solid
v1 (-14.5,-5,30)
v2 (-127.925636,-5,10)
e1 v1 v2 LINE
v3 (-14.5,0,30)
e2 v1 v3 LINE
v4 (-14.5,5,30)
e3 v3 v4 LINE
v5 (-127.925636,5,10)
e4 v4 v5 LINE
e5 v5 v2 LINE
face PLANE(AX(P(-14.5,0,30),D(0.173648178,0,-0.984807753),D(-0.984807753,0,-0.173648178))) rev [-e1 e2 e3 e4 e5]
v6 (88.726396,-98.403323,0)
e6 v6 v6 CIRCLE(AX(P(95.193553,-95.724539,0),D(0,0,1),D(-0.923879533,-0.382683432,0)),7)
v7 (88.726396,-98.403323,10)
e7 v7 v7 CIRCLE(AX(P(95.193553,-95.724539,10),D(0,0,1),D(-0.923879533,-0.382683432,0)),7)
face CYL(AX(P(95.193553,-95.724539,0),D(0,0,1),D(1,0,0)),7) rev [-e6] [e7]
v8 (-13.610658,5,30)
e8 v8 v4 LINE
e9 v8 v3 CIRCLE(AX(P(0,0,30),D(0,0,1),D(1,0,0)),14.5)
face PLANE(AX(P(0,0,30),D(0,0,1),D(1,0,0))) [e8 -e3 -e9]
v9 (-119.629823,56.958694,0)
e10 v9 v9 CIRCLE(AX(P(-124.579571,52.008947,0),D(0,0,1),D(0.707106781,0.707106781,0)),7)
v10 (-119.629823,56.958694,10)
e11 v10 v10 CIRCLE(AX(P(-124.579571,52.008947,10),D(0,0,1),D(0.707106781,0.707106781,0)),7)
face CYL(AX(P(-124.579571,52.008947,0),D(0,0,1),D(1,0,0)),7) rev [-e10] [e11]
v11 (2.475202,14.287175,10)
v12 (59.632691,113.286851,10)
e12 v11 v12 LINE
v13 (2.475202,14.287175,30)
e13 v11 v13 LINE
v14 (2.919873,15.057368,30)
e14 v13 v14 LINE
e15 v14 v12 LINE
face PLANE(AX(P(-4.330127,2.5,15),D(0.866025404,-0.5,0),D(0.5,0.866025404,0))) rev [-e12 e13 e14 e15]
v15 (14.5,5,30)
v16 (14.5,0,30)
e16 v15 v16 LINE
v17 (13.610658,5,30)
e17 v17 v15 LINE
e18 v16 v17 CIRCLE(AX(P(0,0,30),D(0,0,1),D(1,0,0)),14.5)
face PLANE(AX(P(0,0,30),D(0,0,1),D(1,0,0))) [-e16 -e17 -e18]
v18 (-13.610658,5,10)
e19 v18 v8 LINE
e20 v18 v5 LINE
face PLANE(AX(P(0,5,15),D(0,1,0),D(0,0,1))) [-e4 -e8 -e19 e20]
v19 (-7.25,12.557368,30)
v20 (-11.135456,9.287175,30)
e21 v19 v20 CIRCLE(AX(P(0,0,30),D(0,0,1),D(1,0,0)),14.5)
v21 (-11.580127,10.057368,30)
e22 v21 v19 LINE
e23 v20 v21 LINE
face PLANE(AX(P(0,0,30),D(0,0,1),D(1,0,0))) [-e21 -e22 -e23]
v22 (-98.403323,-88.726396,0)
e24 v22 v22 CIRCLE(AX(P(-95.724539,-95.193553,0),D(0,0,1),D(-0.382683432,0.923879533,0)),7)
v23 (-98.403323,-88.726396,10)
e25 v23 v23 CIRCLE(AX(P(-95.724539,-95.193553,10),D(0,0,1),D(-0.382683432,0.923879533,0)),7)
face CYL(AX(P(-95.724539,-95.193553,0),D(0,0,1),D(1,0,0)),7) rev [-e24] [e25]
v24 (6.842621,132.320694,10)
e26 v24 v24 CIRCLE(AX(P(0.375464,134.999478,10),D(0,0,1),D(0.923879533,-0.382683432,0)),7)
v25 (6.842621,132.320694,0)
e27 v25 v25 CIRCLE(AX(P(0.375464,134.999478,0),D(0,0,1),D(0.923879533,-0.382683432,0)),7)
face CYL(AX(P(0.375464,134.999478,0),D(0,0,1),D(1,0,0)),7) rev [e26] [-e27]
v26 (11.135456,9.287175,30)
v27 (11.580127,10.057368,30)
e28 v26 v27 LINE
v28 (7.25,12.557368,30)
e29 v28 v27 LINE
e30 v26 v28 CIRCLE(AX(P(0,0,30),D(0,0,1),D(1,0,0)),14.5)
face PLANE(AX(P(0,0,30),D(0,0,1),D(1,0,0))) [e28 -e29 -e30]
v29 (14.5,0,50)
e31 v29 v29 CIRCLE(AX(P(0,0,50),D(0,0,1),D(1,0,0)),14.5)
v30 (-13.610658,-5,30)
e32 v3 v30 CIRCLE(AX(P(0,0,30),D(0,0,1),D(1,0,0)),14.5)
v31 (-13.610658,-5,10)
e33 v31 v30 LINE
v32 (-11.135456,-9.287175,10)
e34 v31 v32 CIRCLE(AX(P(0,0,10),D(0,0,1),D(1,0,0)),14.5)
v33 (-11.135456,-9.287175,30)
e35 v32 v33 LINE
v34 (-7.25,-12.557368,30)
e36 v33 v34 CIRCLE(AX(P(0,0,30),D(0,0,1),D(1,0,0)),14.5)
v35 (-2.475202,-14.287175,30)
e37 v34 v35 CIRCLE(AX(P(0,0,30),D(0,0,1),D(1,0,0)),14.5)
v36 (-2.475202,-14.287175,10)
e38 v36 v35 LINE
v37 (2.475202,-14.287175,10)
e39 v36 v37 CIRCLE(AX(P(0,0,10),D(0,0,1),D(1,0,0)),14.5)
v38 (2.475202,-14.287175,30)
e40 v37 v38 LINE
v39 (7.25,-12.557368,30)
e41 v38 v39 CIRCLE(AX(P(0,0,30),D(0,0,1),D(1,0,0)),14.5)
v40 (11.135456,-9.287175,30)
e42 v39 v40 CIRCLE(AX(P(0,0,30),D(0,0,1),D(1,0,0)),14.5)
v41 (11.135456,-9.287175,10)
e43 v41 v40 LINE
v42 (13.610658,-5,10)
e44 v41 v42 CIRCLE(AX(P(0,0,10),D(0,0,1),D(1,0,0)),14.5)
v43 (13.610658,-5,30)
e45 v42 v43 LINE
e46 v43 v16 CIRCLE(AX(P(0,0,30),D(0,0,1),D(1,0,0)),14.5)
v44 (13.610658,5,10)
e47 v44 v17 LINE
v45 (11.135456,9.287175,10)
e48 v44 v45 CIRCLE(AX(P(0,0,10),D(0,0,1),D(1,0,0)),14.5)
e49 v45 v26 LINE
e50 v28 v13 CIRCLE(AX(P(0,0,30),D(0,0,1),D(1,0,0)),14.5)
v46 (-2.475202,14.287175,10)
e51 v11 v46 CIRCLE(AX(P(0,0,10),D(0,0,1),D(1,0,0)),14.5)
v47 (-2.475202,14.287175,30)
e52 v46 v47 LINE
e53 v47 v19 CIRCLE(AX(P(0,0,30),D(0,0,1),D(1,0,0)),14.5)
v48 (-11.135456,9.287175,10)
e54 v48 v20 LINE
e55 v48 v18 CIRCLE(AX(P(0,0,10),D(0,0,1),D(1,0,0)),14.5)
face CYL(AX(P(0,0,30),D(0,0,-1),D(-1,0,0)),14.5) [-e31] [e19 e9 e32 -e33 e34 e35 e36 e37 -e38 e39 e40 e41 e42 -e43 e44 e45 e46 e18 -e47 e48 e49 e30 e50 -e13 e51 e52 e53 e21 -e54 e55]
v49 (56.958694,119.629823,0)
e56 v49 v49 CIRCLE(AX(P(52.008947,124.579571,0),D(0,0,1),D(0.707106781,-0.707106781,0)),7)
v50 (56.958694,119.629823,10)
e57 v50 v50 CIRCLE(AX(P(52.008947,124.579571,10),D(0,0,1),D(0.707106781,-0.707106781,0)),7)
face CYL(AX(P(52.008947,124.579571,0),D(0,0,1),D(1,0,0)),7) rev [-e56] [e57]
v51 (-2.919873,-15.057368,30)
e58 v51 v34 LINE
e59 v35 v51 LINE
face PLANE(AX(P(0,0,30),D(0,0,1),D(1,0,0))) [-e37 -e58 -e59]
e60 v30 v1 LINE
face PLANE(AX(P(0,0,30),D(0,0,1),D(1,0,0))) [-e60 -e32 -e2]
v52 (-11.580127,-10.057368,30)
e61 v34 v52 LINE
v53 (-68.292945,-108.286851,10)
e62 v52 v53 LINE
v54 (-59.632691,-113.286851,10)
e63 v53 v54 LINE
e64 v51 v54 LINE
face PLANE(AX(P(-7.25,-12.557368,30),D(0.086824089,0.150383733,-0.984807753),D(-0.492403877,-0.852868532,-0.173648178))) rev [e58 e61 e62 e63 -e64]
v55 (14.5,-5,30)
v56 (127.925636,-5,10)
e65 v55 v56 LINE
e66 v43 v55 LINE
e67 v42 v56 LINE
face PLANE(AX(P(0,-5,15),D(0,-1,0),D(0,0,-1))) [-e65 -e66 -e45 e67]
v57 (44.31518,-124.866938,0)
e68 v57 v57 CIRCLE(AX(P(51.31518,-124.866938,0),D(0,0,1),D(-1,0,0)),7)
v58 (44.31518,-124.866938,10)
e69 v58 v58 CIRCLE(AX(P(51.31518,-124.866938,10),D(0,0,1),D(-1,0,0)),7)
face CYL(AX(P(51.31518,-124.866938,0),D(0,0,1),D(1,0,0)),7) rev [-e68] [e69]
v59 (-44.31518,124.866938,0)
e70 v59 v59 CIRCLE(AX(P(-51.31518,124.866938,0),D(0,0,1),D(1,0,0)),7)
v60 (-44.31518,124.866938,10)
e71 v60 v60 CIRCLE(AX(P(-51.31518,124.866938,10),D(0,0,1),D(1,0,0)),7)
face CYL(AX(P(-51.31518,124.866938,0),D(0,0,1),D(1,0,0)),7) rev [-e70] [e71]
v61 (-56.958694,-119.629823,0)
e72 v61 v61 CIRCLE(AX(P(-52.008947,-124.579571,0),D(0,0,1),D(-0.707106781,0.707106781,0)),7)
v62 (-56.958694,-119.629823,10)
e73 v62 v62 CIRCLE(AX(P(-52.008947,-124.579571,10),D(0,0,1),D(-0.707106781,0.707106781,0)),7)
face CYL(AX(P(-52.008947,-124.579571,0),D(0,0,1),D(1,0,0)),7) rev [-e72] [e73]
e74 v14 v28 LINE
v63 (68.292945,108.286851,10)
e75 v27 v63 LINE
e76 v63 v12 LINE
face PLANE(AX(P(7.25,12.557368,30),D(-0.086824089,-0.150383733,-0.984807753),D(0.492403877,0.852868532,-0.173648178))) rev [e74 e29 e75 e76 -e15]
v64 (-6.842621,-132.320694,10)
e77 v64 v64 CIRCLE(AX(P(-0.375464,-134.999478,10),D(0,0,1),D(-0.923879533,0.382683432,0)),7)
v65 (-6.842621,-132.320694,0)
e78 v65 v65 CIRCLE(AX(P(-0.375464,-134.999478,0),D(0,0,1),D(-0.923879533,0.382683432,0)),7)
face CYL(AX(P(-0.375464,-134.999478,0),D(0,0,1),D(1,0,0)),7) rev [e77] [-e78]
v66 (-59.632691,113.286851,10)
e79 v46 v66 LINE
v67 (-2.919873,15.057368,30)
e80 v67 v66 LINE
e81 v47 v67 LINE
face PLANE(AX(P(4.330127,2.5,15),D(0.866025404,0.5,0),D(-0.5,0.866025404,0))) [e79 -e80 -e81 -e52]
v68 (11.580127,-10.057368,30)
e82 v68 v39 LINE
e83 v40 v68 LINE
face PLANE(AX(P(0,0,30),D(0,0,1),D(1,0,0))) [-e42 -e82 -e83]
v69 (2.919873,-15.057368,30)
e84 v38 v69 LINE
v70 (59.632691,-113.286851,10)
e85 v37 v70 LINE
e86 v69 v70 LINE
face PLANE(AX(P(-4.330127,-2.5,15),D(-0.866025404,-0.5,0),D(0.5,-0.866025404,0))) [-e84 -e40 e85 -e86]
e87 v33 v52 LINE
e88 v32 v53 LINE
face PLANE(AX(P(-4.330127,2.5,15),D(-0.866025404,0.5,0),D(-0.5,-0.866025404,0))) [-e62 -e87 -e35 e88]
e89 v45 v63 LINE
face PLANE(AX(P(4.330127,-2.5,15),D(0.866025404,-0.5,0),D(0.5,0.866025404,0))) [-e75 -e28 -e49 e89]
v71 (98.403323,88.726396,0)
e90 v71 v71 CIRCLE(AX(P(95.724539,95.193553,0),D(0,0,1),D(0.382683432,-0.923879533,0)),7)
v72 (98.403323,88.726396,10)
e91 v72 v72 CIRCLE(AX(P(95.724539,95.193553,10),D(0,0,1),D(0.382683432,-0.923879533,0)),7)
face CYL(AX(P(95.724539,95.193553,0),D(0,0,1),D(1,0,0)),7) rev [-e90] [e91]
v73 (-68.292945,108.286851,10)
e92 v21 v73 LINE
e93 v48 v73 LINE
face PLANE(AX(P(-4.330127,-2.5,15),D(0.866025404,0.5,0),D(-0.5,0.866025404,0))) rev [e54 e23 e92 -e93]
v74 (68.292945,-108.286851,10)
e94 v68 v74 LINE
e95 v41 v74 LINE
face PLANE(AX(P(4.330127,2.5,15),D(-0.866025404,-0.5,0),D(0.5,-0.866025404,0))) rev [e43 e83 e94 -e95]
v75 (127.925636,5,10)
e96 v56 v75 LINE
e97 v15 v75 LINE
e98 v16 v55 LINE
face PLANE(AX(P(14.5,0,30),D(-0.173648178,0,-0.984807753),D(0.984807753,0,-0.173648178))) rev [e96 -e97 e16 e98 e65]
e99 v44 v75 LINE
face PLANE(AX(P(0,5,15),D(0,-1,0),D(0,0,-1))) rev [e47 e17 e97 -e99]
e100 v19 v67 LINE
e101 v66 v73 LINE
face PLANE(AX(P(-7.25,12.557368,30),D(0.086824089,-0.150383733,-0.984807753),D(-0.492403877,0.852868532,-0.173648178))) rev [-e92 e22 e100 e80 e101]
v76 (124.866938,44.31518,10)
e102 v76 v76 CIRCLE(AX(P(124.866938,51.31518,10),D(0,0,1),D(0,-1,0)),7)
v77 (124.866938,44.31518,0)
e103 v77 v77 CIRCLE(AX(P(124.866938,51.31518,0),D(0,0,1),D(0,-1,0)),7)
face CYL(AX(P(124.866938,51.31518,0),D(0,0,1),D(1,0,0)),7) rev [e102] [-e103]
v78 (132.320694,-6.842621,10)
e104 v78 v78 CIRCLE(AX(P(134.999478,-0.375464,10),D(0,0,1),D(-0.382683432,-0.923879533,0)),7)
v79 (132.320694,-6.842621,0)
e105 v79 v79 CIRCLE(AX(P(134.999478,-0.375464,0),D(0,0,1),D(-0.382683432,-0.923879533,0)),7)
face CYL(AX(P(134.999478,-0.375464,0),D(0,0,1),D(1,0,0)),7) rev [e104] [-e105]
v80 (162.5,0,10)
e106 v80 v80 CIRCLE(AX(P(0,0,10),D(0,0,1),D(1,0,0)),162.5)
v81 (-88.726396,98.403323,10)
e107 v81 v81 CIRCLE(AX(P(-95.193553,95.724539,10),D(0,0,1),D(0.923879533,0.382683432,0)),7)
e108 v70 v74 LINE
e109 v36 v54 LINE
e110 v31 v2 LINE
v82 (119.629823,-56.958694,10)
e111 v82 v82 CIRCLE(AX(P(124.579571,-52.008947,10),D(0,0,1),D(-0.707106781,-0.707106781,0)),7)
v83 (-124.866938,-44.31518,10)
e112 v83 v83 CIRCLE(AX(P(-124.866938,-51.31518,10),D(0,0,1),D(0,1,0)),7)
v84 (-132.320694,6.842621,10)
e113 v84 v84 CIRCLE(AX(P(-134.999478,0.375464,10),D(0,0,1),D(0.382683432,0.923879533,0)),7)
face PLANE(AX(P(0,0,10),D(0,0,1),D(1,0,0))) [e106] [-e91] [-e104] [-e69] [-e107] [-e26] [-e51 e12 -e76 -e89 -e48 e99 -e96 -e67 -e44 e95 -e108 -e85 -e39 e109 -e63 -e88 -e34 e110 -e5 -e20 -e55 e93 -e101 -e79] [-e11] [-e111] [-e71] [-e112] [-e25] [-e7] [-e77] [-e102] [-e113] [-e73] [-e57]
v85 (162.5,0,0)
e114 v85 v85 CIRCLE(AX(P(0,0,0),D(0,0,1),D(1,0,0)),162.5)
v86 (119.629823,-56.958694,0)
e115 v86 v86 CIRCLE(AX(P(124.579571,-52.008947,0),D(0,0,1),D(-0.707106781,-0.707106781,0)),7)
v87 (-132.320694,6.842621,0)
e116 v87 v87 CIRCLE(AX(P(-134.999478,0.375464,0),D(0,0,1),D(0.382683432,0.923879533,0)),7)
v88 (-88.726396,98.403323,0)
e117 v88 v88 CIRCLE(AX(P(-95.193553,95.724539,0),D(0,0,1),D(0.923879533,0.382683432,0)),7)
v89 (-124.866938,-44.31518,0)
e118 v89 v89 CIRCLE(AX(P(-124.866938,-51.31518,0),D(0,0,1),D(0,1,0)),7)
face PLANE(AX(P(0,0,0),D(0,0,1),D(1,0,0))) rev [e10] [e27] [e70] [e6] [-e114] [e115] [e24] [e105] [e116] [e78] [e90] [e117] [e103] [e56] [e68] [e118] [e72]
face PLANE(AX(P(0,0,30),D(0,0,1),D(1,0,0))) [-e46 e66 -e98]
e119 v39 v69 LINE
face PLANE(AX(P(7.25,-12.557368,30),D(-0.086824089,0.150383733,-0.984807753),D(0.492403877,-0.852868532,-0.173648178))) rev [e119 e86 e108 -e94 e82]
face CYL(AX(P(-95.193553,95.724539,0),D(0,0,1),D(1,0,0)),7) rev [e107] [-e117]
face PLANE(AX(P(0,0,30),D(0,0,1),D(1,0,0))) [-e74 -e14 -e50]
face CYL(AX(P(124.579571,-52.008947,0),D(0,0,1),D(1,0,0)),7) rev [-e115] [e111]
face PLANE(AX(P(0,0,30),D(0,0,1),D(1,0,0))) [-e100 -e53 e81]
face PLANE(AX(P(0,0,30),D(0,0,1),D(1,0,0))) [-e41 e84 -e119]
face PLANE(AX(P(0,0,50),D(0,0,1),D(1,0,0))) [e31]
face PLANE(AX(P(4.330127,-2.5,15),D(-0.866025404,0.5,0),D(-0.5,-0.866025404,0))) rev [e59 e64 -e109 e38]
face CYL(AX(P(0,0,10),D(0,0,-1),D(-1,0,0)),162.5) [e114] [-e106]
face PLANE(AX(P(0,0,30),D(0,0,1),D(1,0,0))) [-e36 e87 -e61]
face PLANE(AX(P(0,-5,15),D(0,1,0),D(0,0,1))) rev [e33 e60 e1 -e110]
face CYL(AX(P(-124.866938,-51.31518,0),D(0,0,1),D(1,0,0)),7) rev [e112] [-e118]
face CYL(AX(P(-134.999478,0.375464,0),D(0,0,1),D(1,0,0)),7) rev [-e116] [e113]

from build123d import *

# Parameters (mm, degrees)
SKETCH1_R           = 162.5
BOSS_EXTRUDE1_DEPTH = 10
SKETCH2_R           = 7
CUT_EXTRUDE1_DEPTH  = 231.027172308
CIRPATTERN1_COUNT   = 16
SKETCH3_R           = 14.5
BOSS_EXTRUDE2_DEPTH = 20
RIB1_START          = -5
RIB1_DEPTH          = 10
CIRPATTERN2_COUNT   = 6
SKETCH6_R           = 14.5
BOSS_EXTRUDE3_DEPTH = 20


with BuildPart() as part:
    # Sketch1 → Boss-Extrude1 (new body)
    with BuildSketch(Plane.XY):
        Circle(SKETCH1_R)
    extrude(amount=BOSS_EXTRUDE1_DEPTH)

    # Sketch2 → Cut-Extrude1 (cut, through all)
    with BuildSketch(Plane.XY.offset(10)):
        with Locations((-51.315180135, 124.866938329)):
            Circle(SKETCH2_R)
    cut_extrude1 = extrude(amount=-CUT_EXTRUDE1_DEPTH, mode=Mode.SUBTRACT)

    # CirPattern1: Cut-Extrude1 ×16 about axis
    cirpattern1_axis = Axis((0, 0, 0), (0, 0, 1))
    for i in range(1, CIRPATTERN1_COUNT):
        add(cut_extrude1.rotate(cirpattern1_axis, i * 360 / CIRPATTERN1_COUNT), mode=Mode.SUBTRACT)

    # Sketch3 → Boss-Extrude2 (add)
    with BuildSketch(Plane.XY.offset(10)):
        Circle(SKETCH3_R)
    extrude(amount=BOSS_EXTRUDE2_DEPTH)

    # Rib1: read off the stored shape, not the designer's step
    # Rib1 outline → Rib1 (add)
    with BuildSketch(Plane(origin=(0, 0, 0), x_dir=(1, 0, 0), z_dir=(0, 1, 0)).offset(RIB1_START)):
        Polygon((-14.5, -30), (-13.610657589, -30), (-13.610657589, -10), (-127.925636392, -10), align=None)
    rib1 = extrude(amount=RIB1_DEPTH)

    # CirPattern2: Rib1 ×6 about axis
    cirpattern2_axis = Axis((0, 0, 0), (0, 0, 1))
    for i in range(1, CIRPATTERN2_COUNT):
        add(rib1.rotate(cirpattern2_axis, i * 360 / CIRPATTERN2_COUNT))

    # Sketch6 → Boss-Extrude3 (add)
    with BuildSketch(Plane.XY.offset(30)):
        Circle(SKETCH6_R)
    extrude(amount=BOSS_EXTRUDE3_DEPTH)


solid = part.part
